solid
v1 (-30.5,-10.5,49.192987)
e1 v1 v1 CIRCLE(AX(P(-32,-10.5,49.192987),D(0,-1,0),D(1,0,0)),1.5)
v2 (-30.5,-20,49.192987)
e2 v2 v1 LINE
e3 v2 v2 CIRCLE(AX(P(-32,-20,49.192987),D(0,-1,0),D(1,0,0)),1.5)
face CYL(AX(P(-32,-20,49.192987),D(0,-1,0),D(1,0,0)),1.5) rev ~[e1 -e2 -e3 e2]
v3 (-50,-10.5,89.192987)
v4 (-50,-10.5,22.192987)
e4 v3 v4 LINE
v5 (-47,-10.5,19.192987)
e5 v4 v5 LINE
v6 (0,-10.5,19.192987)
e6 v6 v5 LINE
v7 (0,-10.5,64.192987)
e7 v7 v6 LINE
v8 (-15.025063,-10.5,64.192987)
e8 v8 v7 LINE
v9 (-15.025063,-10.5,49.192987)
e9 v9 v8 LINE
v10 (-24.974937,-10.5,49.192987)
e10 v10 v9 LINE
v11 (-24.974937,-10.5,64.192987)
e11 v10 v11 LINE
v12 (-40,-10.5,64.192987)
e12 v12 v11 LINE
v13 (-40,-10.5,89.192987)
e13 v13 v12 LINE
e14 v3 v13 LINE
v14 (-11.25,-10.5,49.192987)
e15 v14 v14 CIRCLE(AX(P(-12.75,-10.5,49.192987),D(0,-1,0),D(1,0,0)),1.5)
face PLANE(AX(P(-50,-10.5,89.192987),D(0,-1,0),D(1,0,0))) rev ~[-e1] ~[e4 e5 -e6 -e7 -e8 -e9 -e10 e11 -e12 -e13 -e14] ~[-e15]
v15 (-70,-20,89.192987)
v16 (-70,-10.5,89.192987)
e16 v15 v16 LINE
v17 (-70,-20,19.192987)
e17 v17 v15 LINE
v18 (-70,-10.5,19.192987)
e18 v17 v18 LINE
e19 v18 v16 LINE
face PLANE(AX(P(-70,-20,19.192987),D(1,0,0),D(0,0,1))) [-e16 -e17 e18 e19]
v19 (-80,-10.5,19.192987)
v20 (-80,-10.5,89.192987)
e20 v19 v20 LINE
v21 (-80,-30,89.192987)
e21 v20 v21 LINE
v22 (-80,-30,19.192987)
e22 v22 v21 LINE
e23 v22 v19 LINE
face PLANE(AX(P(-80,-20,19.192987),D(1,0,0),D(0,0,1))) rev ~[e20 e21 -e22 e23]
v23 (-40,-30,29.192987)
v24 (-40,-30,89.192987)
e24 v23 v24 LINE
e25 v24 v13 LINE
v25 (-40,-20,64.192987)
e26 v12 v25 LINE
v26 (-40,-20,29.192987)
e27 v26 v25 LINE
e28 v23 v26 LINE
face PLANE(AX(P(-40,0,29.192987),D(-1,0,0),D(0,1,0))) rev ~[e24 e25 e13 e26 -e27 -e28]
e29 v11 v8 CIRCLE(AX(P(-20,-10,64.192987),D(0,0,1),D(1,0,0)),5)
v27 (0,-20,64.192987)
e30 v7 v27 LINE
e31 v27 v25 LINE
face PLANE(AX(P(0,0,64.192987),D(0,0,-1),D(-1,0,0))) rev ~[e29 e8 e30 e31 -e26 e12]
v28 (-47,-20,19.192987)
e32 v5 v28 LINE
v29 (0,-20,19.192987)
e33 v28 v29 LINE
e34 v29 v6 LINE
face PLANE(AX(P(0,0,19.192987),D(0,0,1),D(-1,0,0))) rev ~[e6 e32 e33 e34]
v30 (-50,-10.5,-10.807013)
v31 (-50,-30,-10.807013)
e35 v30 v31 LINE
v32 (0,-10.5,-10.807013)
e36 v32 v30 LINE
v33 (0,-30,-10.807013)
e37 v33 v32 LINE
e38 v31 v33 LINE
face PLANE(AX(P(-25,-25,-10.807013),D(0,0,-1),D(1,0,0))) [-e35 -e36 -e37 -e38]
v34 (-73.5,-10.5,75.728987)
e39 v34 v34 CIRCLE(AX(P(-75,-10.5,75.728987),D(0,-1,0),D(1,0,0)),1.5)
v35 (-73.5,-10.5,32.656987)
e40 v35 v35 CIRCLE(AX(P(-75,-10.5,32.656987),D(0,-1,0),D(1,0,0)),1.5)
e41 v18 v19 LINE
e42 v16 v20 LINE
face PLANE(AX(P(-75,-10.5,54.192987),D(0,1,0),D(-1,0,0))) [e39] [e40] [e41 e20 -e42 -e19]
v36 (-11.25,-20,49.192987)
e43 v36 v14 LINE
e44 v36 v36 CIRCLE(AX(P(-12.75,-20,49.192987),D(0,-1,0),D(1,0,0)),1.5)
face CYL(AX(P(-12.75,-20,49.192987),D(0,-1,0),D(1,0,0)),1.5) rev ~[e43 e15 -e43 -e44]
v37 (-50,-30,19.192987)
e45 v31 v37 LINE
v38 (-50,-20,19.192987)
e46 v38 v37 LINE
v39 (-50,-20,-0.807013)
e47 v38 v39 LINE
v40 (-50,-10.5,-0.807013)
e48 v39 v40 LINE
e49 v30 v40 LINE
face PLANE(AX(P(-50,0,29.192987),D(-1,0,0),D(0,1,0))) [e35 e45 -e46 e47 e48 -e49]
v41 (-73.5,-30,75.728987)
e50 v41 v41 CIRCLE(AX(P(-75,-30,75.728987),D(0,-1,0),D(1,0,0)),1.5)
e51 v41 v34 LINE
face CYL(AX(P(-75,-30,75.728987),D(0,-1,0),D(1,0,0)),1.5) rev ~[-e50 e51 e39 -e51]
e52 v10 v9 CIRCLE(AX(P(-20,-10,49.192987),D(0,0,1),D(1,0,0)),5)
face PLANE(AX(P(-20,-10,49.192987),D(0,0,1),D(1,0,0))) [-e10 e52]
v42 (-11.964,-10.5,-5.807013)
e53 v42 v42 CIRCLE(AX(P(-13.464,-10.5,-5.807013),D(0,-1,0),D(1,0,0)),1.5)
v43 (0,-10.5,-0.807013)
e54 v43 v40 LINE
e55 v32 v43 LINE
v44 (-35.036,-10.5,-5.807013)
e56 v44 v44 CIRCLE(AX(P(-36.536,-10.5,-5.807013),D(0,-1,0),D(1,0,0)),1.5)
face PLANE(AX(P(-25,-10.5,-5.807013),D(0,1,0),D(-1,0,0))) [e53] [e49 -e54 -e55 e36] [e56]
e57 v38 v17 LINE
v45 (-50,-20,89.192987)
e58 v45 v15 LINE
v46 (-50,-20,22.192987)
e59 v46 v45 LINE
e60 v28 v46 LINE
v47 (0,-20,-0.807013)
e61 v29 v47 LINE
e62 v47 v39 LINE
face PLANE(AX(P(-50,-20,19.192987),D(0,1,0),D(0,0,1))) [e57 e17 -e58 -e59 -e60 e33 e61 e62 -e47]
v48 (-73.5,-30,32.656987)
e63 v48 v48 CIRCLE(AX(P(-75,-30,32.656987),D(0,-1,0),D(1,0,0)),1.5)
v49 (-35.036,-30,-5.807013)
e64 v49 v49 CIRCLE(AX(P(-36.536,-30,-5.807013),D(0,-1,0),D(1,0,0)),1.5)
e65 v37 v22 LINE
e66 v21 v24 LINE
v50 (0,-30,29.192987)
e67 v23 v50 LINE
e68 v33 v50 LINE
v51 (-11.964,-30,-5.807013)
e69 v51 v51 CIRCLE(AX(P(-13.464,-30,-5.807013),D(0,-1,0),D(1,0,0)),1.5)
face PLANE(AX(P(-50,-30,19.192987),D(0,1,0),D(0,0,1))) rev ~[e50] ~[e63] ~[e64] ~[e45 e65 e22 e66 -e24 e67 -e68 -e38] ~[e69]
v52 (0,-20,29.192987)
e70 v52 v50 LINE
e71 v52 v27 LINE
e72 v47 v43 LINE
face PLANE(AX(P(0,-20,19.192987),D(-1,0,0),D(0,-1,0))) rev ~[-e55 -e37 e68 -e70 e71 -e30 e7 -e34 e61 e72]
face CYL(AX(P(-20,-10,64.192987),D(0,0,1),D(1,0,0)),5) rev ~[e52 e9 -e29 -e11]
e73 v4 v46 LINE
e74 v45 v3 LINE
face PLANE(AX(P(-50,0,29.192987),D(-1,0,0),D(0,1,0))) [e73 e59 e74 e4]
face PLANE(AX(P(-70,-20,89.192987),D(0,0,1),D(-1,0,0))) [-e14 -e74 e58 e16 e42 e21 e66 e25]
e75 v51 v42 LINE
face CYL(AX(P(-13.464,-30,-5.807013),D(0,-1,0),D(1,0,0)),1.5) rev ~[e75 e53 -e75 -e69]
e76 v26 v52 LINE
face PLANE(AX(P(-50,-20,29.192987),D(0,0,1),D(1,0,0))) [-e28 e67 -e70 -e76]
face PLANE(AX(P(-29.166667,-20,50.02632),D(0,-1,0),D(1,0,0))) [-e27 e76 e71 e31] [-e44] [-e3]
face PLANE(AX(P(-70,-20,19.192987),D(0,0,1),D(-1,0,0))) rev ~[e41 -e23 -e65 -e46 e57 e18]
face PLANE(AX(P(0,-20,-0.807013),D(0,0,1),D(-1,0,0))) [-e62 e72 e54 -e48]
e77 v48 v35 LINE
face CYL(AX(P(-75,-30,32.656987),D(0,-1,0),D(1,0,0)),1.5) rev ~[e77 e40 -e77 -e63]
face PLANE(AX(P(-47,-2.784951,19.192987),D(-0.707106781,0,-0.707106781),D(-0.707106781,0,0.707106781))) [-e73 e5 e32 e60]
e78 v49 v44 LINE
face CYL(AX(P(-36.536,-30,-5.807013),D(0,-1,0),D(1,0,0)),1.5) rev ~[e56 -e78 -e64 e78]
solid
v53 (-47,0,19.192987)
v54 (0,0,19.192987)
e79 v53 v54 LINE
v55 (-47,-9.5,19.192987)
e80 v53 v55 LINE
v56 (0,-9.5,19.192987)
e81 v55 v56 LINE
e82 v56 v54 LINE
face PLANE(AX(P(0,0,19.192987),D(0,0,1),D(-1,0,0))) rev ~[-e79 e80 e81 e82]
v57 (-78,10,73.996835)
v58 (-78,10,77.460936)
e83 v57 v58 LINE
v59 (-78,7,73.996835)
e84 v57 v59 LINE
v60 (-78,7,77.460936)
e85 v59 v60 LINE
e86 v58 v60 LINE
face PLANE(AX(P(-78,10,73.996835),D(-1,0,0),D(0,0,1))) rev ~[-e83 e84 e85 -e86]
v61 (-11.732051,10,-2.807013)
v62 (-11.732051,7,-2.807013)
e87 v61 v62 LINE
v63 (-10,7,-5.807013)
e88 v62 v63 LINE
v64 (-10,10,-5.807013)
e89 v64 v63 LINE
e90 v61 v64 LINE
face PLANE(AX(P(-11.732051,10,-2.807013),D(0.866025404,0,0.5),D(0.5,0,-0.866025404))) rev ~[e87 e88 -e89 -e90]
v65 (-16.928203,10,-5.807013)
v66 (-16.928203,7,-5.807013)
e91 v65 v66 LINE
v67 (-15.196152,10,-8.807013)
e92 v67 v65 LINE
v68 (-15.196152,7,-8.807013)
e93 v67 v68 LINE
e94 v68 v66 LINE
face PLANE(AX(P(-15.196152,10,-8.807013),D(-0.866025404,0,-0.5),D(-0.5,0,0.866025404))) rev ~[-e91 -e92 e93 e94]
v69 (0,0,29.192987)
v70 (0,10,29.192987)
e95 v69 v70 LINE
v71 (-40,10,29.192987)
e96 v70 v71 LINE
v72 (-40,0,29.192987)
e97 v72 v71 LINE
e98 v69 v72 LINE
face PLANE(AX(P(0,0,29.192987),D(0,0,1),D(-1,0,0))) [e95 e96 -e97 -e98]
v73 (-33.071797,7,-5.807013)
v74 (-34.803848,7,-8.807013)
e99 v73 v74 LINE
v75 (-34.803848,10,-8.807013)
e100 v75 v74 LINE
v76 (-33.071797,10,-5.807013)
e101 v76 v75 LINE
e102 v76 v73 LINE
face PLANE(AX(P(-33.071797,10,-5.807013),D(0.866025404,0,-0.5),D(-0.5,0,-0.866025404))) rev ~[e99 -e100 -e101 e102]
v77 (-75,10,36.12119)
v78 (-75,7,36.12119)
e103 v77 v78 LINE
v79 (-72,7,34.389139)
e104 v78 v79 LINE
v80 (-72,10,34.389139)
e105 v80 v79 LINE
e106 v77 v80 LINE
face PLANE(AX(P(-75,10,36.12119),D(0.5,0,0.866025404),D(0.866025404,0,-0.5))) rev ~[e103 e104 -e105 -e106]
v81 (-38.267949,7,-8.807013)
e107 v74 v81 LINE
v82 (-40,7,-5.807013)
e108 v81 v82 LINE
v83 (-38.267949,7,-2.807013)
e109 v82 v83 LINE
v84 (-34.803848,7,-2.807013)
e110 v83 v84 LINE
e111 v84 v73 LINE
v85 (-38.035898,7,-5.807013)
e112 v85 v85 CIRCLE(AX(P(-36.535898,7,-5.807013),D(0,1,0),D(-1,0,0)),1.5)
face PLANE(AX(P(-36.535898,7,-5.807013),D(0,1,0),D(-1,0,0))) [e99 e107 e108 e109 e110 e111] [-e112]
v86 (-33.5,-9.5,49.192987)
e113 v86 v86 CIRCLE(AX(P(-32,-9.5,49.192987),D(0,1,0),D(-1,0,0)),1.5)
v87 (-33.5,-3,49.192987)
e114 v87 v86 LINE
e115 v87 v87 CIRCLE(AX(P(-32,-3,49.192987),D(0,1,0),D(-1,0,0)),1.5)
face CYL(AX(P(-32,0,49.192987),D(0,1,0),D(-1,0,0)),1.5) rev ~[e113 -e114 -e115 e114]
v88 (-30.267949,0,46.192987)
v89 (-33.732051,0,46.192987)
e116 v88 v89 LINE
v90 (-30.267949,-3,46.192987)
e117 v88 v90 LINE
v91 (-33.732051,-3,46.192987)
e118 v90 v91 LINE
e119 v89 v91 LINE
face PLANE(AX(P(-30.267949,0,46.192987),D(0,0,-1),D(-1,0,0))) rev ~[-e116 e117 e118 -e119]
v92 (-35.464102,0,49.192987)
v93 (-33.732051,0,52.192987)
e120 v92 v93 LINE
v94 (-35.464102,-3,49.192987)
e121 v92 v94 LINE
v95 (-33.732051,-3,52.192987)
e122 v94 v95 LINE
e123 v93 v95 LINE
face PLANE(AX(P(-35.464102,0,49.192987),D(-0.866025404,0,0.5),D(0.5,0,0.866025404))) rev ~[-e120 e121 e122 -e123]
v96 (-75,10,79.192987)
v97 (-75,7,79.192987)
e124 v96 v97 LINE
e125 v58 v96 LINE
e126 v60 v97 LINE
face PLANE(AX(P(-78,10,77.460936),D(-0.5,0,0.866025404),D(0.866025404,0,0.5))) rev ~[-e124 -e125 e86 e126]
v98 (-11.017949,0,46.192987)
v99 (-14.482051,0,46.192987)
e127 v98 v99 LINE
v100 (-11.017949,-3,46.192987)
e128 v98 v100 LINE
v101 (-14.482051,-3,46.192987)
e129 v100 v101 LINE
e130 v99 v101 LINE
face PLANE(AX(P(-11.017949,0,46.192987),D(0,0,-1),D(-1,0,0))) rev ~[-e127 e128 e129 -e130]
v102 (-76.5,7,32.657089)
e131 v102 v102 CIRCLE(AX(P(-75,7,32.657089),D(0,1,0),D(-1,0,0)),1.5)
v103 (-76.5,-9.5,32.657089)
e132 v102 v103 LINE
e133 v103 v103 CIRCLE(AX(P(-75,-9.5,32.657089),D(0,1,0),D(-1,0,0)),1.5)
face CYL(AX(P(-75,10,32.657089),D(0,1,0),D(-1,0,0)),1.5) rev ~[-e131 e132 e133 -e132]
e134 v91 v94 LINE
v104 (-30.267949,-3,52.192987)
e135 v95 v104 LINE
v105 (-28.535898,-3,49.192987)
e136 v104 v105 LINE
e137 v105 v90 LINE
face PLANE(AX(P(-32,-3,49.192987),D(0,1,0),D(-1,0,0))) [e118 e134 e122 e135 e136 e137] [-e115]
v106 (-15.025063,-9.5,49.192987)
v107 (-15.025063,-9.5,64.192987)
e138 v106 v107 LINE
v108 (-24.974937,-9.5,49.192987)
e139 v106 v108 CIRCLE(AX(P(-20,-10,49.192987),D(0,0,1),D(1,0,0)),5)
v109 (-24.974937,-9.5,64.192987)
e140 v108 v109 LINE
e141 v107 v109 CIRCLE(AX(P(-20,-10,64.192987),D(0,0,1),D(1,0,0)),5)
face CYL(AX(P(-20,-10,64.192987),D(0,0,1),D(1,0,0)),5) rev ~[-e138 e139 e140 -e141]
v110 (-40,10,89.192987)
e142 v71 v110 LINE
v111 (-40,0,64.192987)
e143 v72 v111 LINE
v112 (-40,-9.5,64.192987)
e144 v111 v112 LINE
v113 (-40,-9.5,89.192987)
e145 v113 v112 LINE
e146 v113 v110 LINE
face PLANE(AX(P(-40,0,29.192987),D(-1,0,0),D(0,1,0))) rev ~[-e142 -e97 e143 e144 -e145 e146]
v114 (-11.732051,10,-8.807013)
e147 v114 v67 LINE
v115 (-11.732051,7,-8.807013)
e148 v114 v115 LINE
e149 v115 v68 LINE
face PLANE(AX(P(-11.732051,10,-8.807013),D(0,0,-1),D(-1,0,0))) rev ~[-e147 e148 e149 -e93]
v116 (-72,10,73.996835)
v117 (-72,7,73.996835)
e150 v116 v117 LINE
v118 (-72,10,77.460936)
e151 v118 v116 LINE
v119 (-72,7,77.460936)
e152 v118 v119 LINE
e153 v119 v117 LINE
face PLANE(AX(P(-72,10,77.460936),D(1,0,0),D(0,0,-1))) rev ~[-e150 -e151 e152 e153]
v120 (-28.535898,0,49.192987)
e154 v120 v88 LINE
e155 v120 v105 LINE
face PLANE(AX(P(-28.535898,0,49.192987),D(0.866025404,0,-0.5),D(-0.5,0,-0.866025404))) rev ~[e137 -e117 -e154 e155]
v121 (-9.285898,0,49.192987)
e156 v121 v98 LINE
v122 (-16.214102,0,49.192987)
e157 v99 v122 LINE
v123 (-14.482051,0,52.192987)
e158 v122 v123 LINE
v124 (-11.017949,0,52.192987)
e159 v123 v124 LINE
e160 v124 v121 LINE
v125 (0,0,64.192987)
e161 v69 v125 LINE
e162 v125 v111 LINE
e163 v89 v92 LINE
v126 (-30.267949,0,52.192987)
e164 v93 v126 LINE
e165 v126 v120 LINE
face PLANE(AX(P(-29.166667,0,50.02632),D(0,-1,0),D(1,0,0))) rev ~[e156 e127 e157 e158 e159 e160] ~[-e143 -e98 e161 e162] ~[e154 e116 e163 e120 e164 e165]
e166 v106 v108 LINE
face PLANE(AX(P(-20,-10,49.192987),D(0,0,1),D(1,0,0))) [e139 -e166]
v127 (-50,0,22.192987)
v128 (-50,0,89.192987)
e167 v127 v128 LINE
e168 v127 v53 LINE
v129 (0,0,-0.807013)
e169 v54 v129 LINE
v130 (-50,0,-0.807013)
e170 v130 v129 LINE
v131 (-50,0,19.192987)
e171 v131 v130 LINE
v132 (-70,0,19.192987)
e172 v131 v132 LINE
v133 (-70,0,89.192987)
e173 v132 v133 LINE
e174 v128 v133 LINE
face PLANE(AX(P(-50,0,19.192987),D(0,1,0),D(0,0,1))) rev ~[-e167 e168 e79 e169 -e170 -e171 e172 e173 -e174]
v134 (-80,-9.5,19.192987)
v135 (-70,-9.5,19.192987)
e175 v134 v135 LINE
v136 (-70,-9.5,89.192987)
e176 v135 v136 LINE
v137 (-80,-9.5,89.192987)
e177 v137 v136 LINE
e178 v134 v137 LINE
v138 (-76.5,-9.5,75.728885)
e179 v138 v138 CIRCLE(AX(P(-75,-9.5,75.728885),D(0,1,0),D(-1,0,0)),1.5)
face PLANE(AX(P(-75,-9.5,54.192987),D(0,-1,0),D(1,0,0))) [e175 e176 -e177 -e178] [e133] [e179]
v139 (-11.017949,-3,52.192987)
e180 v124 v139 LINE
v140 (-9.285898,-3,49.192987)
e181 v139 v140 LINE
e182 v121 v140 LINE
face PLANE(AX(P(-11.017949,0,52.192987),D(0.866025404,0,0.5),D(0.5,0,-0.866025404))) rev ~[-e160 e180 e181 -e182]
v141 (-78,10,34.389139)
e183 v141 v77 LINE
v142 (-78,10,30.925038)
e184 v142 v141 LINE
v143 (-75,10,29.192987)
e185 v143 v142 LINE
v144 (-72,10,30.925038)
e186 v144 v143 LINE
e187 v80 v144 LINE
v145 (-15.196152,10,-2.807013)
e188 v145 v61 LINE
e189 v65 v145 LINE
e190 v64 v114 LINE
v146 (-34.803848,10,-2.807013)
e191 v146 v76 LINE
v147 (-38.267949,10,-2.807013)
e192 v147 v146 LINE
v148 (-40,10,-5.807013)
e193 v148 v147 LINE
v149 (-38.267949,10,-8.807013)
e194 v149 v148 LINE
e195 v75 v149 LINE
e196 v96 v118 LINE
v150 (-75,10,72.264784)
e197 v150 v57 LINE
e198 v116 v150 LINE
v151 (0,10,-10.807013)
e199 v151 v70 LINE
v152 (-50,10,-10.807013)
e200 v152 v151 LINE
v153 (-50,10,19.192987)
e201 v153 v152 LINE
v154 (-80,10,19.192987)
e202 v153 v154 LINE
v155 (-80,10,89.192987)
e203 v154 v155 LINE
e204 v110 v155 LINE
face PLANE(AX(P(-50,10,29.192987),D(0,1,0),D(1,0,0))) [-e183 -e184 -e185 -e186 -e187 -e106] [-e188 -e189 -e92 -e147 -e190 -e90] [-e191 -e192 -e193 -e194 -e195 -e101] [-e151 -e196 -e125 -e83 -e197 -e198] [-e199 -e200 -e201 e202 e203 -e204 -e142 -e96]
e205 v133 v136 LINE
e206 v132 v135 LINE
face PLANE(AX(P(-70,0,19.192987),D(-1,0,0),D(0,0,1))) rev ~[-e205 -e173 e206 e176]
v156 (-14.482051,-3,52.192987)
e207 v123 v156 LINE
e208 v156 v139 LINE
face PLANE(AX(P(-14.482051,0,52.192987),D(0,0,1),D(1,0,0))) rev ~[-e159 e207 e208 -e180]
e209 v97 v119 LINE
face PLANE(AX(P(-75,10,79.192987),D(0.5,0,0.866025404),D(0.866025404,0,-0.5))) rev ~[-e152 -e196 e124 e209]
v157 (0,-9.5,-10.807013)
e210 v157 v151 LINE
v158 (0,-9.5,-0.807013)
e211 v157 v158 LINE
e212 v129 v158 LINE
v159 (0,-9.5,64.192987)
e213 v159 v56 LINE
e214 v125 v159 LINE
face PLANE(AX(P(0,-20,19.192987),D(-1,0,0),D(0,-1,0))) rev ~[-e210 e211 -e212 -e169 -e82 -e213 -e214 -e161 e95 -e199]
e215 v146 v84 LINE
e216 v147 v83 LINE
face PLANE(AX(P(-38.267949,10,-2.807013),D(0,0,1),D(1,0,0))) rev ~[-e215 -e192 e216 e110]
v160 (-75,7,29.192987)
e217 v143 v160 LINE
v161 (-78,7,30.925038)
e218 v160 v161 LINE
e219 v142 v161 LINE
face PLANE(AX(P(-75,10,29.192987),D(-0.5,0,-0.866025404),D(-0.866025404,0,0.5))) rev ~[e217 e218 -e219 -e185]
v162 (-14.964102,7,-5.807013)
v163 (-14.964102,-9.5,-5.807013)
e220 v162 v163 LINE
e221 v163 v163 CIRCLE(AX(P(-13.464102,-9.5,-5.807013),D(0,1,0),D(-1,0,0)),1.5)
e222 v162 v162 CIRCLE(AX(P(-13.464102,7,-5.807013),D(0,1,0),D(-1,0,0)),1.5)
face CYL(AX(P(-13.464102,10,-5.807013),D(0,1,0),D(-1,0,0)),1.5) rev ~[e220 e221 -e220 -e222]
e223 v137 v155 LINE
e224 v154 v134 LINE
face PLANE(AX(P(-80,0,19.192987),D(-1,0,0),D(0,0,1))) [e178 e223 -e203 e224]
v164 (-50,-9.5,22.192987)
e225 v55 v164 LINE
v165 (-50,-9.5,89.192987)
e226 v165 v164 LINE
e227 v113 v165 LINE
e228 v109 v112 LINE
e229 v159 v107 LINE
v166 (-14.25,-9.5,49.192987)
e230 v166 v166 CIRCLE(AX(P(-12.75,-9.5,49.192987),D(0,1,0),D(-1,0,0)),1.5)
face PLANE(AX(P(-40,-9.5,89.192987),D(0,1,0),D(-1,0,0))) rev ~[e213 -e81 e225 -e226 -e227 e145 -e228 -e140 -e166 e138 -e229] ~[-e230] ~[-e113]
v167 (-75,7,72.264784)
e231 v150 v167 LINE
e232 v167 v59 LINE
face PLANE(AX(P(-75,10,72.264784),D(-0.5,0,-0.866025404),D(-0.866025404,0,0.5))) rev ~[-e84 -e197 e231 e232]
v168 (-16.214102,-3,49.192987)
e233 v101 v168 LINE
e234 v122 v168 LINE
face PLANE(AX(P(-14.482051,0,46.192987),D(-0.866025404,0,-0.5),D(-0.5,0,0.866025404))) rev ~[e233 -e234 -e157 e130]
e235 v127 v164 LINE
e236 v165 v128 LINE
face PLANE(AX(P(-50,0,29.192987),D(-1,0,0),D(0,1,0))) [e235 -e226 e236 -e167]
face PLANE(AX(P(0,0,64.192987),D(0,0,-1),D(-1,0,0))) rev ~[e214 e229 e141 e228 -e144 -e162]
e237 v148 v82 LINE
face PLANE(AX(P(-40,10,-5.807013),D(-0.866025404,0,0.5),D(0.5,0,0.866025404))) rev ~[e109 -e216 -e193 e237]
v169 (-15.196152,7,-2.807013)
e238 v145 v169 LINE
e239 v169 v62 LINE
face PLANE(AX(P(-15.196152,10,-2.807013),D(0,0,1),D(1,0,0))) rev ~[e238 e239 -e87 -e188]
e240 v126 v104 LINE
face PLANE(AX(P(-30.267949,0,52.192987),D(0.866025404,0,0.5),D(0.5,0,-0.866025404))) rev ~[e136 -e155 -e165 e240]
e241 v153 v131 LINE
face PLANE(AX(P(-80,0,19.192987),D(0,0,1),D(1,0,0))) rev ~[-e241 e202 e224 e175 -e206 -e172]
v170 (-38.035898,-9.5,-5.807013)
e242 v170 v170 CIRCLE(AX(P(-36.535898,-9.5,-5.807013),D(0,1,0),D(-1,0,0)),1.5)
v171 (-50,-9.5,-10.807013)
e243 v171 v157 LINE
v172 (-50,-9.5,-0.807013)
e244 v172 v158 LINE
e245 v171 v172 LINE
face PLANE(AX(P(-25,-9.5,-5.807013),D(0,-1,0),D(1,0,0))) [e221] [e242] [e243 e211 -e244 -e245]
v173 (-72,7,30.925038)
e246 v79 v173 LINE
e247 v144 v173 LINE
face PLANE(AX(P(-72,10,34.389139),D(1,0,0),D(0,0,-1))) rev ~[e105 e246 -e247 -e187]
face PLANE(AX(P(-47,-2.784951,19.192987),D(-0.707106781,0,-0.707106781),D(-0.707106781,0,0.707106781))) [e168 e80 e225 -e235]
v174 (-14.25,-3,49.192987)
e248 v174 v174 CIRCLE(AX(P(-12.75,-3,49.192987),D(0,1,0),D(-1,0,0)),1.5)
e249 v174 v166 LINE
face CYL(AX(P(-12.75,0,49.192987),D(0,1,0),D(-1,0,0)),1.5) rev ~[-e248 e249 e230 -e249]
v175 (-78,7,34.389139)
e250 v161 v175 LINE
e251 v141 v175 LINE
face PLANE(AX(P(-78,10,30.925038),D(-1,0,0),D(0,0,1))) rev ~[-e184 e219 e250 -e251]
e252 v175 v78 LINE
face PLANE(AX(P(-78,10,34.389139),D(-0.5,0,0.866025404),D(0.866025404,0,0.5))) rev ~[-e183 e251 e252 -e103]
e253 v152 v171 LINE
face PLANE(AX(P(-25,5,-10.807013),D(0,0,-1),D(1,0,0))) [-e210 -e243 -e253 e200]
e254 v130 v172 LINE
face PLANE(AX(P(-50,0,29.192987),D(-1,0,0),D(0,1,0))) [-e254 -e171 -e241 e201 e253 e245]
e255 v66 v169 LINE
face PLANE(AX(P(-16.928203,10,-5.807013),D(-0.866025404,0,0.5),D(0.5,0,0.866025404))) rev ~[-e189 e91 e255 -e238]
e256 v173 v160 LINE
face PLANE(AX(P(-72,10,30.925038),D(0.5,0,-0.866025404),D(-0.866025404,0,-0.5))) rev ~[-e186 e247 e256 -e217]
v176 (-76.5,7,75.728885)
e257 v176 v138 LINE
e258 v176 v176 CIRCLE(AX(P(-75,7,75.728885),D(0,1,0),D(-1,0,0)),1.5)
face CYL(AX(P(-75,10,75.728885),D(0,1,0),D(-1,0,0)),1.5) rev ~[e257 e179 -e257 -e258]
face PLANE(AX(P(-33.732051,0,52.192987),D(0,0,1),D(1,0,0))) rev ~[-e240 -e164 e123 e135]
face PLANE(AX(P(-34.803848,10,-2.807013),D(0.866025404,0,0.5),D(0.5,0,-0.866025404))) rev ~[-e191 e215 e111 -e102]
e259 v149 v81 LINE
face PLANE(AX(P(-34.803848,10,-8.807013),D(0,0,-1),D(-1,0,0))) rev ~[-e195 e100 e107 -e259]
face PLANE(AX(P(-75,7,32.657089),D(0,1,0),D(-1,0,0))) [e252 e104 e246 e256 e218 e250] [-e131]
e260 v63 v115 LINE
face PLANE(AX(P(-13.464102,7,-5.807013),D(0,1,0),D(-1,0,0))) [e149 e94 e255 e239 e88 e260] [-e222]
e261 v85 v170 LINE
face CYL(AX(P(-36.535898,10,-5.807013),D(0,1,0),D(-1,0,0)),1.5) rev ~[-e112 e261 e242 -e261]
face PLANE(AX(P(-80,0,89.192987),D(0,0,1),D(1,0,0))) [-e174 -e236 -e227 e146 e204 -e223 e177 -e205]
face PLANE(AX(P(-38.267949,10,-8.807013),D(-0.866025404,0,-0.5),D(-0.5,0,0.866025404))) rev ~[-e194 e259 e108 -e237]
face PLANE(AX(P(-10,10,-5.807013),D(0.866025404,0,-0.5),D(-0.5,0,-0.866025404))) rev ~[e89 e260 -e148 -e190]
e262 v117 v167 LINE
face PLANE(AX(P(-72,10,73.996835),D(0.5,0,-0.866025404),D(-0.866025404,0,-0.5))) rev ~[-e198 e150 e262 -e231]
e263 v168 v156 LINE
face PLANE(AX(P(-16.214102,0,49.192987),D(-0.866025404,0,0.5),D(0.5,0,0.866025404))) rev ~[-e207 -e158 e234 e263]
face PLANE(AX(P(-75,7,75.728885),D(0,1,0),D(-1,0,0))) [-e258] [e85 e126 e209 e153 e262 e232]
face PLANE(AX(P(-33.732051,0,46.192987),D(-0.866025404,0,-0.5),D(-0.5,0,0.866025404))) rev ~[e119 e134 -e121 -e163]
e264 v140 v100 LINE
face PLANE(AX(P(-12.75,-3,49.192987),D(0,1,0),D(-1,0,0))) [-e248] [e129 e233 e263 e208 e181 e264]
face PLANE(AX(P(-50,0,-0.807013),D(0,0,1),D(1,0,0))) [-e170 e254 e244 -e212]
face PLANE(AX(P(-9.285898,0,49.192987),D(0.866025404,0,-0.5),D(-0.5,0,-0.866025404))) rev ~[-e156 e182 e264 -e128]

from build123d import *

# Parameters (mm, degrees)
F1_DEPTH        = 20
F2_W            = 50
F2_H            = 10
F3_DEPTH        = 10
F4_W            = 50
F4_H            = 10
F5_DEPTH        = 10
F6_W            = 50
F6_H            = 10
F7_DEPTH        = 30
F8_W            = 10
F8_H            = 10
F9_DEPTH        = 60
F10_W           = 10
F10_H           = 70
F11_DEPTH       = 30
F12_R           = 5
F13_DEPTH       = 15
F16_DEPTH       = 70
F17_T1_DEPTH    = 17.2150489639
F17_S1_T1_DEPTH = 10.5
F18_W           = 10
F18_H           = 70
F18_W_2         = 50
F18_H_2         = 10
F20_DEPTH       = 9.5
F19_W           = 10
F19_H           = 70
F19_W_2         = 50
F19_H_2         = 10
F21_DEPTH       = 9.5
F22_R           = 1.5
F23_DEPTH       = 20
F24_R           = 1.5
F25_DEPTH       = 20
F26_DEPTH       = 3
F28_R           = 1.5
F29_DEPTH       = 10
F27_R           = 1.5
F30_DEPTH       = 10
F31_DEPTH       = 3


# Not quite as in the source:
# - a fillet or chamfer that OpenCascade refuses, or shapes differently, is made with other operations: its cross-section is extruded or revolved along the edge and cut away or added


with BuildPart() as f1:
    # F0 (on Front) → F1 (new body)
    with BuildSketch(Plane.XZ):
        Polygon((-40, 89.1929870069), (-50, 89.1929870069), (-50, 19.1929870069), (0, 19.1929870069), (0, 64.1929870069), (-40, 64.1929870069), align=None)
    extrude(amount=F1_DEPTH)

    # F2 (on face) → F3 (join)
    with BuildSketch(Plane.XZ.offset(20)):
        with Locations((-25, 24.1929870069)):
            Rectangle(F2_W, F2_H)
    extrude(amount=F3_DEPTH)

    # F4 (on face) → F5 (join)
    with BuildSketch(Plane(origin=(0, 0, 0), x_dir=(-1, 0, 0), z_dir=(0, 1, 0))):
        with Locations((25, 24.1929870069)):
            Rectangle(F4_W, F4_H)
    extrude(amount=F5_DEPTH)

    # F6 (on face) → F7 (join)
    with BuildSketch(Plane(origin=(0, 0, 19.1929870069), x_dir=(1, 0, 0), z_dir=(0, 0, -1))):
        with Locations((-25, 25)):
            Rectangle(F6_W, F6_H)
        with Locations((-25, -5)):
            Rectangle(F6_W, F6_H)
    extrude(amount=F7_DEPTH)

    # F8 (on face) → F9 (join)
    with BuildSketch(Plane.XY.offset(29.1929870069)):
        with Locations((-45, 5)):
            Rectangle(F8_W, F8_H)
        with Locations((-45, -25)):
            Rectangle(F8_W, F8_H)
    extrude(amount=F9_DEPTH)

    # F10 (on face) → F11 (join)
    with BuildSketch(Plane(origin=(-50, 0, 0), x_dir=(0, -1, 0), z_dir=(-1, 0, 0))):
        with Locations((25, 54.1929870069)):
            Rectangle(F10_W, F10_H)
        with Locations((-5, 54.1929870069)):
            Rectangle(F10_W, F10_H)
    extrude(amount=F11_DEPTH)

    # F12 (on face) → F13 (cut)
    with BuildSketch(Plane.XY.offset(64.1929870069)):
        with Locations((-20, -10)):
            Circle(F12_R)
    extrude(amount=-F13_DEPTH, mode=Mode.SUBTRACT)

    # F15 (on face) + F14 (on face) → F16 (cut)
    with BuildSketch(Plane.XY.offset(64.1929870069)):
        with BuildLine():
            Line((0, -10.5), (0, -9.5))
            Line((0, -9.5), (-15.0250628145, -9.5))
            ThreePointArc((-15.0250628145, -9.5), (-15.0062696344, -9.7496861247), (-15, -10))
            ThreePointArc((-15, -10), (-15.0062696344, -10.2503138753), (-15.0250628145, -10.5))
            Line((-15.0250628145, -10.5), (0, -10.5))
        make_face()
        with BuildLine():
            Line((-15.0250628145, -9.5), (-24.9749371855, -9.5))
            ThreePointArc((-24.9749371855, -9.5), (-25, -10), (-24.9749371855, -10.5))
            Line((-24.9749371855, -10.5), (-15.0250628145, -10.5))
            ThreePointArc((-15.0250628145, -10.5), (-15.0062696344, -10.2503138753), (-15, -10))
            ThreePointArc((-15, -10), (-15.0062696344, -9.7496861247), (-15.0250628145, -9.5))
        make_face()
        with BuildLine():
            Line((-24.9749371855, -9.5), (-40, -9.5))
            Line((-40, -9.5), (-40, -10.5))
            Line((-40, -10.5), (-24.9749371855, -10.5))
            ThreePointArc((-24.9749371855, -10.5), (-25, -10), (-24.9749371855, -9.5))
        make_face()
    with BuildSketch(Plane.XY.offset(89.1929870069)):
        Polygon((-40, -10.5), (-40, -10), (-40, -9.5), (-50, -9.5), (-50, -10.5), align=None)
    extrude(amount=-F16_DEPTH, mode=Mode.SUBTRACT)

    # F17: chamfer of 3 on 1 edges, made by hand

    # F17_s2 → F17_t1 (cut)
    with BuildSketch(Plane.XZ.offset(2.7849510361)):
        Polygon((-47, 19.1929870069), (-50, 22.1929870069), (-50, 19.1929870069), align=None)
    extrude(amount=F17_T1_DEPTH, mode=Mode.SUBTRACT)

    # F17#s1: chamfer of 3 on 1 edges, made by hand

    # F17_s1_s2 → F17_s1_t1 (cut)
    with BuildSketch(Plane.XZ):
        Polygon((-50, 22.1929870069), (-47, 19.1929870069), (-50, 19.1929870069), align=None)
    extrude(amount=F17_S1_T1_DEPTH, mode=Mode.SUBTRACT)

    # F18 (on face) → F20 (join)
    with BuildSketch(Plane.XZ):
        with Locations((-75, 54.1929870069)):
            Rectangle(F18_W, F18_H)
        with Locations((-25, -5.8070129931)):
            Rectangle(F18_W_2, F18_H_2)
    extrude(amount=F20_DEPTH)

    # F19 (on face) → F21 (join)
    with BuildSketch(Plane(origin=(0, -20, 0), x_dir=(-1, 0, 0), z_dir=(0, 1, 0))):
        with Locations((75, 54.1929870069)):
            Rectangle(F19_W, F19_H)
        with Locations((25, -5.8070129931)):
            Rectangle(F19_W_2, F19_H_2)
    extrude(amount=F21_DEPTH)

    # F22 (on face) → F23 (cut)
    with BuildSketch(Plane.XZ.offset(30)):
        with Locations((-13.464, -5.8070129931)):
            Circle(F22_R)
        with Locations((-75, 75.7289870069)):
            Circle(F22_R)
        with Locations((-75, 32.6569870069)):
            Circle(F22_R)
        with Locations((-36.536, -5.8070129931)):
            Circle(F22_R)
    extrude(amount=-F23_DEPTH, mode=Mode.SUBTRACT)

    # F24 (on face) → F25 (cut)
    with BuildSketch(Plane(origin=(0, 10, 0), x_dir=(-1, 0, 0), z_dir=(0, 1, 0))):
        with Locations((13.4641016151, -5.8070129931)):
            Circle(F24_R)
        with Locations((36.5358983849, -5.8070129931)):
            Circle(F24_R)
        with Locations((75, 32.657088622)):
            Circle(F24_R)
        with Locations((75, 75.7288853918)):
            Circle(F24_R)
    extrude(amount=-F25_DEPTH, mode=Mode.SUBTRACT)

    # F24 (on face) → F26 (cut)
    with BuildSketch(Plane(origin=(0, 10, 0), x_dir=(-1, 0, 0), z_dir=(0, 1, 0))):
        Polygon((34.8038475773, -2.8070129931), (33.0717967697, -5.8070129931), (34.8038475773, -8.8070129931), (38.2679491924, -8.8070129931), (40, -5.8070129931), (38.2679491924, -2.8070129931), align=None)
        with Locations((36.5358983849, -5.8070129931)):
            Circle(F24_R, mode=Mode.SUBTRACT)
        Polygon((11.7320508076, -2.8070129931), (10, -5.8070129931), (11.7320508076, -8.8070129931), (15.1961524227, -8.8070129931), (16.9282032303, -5.8070129931), (15.1961524227, -2.8070129931), align=None)
        with Locations((13.4641016151, -5.8070129931)):
            Circle(F24_R, mode=Mode.SUBTRACT)
        Polygon((72, 30.9250378145), (75, 29.1929870069), (78, 30.9250378145), (78, 34.3891394296), (75, 36.1211902372), (72, 34.3891394296), align=None)
        with Locations((75, 32.657088622)):
            Circle(F24_R, mode=Mode.SUBTRACT)
        Polygon((72, 73.9968345842), (75, 72.2647837766), (78, 73.9968345842), (78, 77.4609361993), (75, 79.1929870069), (72, 77.4609361993), align=None)
        with Locations((75, 75.7288853918)):
            Circle(F24_R, mode=Mode.SUBTRACT)
    extrude(amount=-F26_DEPTH, mode=Mode.SUBTRACT)

    # F28 (on face) → F29 (cut)
    with BuildSketch(Plane(origin=(0, 0, 0), x_dir=(-1, 0, 0), z_dir=(0, 1, 0))):
        with Locations((32, 49.1929870069)):
            Circle(F28_R)
        with Locations((12.75, 49.1929870069)):
            Circle(F28_R)
    extrude(amount=-F29_DEPTH, mode=Mode.SUBTRACT)

    # F27 (on face) → F30 (cut)
    with BuildSketch(Plane.XZ.offset(20)):
        with Locations((-32, 49.1929870069)):
            Circle(F27_R)
        with Locations((-12.75, 49.1929870069)):
            Circle(F27_R)
    extrude(amount=-F30_DEPTH, mode=Mode.SUBTRACT)

    # F28 (on face) → F31 (cut)
    with BuildSketch(Plane(origin=(0, 0, 0), x_dir=(-1, 0, 0), z_dir=(0, 1, 0))):
        Polygon((30.2679491924, 52.1929870069), (28.5358983849, 49.1929870069), (30.2679491924, 46.1929870069), (33.7320508076, 46.1929870069), (35.4641016151, 49.1929870069), (33.7320508076, 52.1929870069), align=None)
        with Locations((32, 49.1929870069)):
            Circle(F28_R, mode=Mode.SUBTRACT)
        Polygon((11.0179491924, 52.1929870069), (9.2858983849, 49.1929870069), (11.0179491924, 46.1929870069), (14.4820508076, 46.1929870069), (16.2141016151, 49.1929870069), (14.4820508076, 52.1929870069), align=None)
        with Locations((12.75, 49.1929870069)):
            Circle(F28_R, mode=Mode.SUBTRACT)
    extrude(amount=-F31_DEPTH, mode=Mode.SUBTRACT)


solid = f1.part
